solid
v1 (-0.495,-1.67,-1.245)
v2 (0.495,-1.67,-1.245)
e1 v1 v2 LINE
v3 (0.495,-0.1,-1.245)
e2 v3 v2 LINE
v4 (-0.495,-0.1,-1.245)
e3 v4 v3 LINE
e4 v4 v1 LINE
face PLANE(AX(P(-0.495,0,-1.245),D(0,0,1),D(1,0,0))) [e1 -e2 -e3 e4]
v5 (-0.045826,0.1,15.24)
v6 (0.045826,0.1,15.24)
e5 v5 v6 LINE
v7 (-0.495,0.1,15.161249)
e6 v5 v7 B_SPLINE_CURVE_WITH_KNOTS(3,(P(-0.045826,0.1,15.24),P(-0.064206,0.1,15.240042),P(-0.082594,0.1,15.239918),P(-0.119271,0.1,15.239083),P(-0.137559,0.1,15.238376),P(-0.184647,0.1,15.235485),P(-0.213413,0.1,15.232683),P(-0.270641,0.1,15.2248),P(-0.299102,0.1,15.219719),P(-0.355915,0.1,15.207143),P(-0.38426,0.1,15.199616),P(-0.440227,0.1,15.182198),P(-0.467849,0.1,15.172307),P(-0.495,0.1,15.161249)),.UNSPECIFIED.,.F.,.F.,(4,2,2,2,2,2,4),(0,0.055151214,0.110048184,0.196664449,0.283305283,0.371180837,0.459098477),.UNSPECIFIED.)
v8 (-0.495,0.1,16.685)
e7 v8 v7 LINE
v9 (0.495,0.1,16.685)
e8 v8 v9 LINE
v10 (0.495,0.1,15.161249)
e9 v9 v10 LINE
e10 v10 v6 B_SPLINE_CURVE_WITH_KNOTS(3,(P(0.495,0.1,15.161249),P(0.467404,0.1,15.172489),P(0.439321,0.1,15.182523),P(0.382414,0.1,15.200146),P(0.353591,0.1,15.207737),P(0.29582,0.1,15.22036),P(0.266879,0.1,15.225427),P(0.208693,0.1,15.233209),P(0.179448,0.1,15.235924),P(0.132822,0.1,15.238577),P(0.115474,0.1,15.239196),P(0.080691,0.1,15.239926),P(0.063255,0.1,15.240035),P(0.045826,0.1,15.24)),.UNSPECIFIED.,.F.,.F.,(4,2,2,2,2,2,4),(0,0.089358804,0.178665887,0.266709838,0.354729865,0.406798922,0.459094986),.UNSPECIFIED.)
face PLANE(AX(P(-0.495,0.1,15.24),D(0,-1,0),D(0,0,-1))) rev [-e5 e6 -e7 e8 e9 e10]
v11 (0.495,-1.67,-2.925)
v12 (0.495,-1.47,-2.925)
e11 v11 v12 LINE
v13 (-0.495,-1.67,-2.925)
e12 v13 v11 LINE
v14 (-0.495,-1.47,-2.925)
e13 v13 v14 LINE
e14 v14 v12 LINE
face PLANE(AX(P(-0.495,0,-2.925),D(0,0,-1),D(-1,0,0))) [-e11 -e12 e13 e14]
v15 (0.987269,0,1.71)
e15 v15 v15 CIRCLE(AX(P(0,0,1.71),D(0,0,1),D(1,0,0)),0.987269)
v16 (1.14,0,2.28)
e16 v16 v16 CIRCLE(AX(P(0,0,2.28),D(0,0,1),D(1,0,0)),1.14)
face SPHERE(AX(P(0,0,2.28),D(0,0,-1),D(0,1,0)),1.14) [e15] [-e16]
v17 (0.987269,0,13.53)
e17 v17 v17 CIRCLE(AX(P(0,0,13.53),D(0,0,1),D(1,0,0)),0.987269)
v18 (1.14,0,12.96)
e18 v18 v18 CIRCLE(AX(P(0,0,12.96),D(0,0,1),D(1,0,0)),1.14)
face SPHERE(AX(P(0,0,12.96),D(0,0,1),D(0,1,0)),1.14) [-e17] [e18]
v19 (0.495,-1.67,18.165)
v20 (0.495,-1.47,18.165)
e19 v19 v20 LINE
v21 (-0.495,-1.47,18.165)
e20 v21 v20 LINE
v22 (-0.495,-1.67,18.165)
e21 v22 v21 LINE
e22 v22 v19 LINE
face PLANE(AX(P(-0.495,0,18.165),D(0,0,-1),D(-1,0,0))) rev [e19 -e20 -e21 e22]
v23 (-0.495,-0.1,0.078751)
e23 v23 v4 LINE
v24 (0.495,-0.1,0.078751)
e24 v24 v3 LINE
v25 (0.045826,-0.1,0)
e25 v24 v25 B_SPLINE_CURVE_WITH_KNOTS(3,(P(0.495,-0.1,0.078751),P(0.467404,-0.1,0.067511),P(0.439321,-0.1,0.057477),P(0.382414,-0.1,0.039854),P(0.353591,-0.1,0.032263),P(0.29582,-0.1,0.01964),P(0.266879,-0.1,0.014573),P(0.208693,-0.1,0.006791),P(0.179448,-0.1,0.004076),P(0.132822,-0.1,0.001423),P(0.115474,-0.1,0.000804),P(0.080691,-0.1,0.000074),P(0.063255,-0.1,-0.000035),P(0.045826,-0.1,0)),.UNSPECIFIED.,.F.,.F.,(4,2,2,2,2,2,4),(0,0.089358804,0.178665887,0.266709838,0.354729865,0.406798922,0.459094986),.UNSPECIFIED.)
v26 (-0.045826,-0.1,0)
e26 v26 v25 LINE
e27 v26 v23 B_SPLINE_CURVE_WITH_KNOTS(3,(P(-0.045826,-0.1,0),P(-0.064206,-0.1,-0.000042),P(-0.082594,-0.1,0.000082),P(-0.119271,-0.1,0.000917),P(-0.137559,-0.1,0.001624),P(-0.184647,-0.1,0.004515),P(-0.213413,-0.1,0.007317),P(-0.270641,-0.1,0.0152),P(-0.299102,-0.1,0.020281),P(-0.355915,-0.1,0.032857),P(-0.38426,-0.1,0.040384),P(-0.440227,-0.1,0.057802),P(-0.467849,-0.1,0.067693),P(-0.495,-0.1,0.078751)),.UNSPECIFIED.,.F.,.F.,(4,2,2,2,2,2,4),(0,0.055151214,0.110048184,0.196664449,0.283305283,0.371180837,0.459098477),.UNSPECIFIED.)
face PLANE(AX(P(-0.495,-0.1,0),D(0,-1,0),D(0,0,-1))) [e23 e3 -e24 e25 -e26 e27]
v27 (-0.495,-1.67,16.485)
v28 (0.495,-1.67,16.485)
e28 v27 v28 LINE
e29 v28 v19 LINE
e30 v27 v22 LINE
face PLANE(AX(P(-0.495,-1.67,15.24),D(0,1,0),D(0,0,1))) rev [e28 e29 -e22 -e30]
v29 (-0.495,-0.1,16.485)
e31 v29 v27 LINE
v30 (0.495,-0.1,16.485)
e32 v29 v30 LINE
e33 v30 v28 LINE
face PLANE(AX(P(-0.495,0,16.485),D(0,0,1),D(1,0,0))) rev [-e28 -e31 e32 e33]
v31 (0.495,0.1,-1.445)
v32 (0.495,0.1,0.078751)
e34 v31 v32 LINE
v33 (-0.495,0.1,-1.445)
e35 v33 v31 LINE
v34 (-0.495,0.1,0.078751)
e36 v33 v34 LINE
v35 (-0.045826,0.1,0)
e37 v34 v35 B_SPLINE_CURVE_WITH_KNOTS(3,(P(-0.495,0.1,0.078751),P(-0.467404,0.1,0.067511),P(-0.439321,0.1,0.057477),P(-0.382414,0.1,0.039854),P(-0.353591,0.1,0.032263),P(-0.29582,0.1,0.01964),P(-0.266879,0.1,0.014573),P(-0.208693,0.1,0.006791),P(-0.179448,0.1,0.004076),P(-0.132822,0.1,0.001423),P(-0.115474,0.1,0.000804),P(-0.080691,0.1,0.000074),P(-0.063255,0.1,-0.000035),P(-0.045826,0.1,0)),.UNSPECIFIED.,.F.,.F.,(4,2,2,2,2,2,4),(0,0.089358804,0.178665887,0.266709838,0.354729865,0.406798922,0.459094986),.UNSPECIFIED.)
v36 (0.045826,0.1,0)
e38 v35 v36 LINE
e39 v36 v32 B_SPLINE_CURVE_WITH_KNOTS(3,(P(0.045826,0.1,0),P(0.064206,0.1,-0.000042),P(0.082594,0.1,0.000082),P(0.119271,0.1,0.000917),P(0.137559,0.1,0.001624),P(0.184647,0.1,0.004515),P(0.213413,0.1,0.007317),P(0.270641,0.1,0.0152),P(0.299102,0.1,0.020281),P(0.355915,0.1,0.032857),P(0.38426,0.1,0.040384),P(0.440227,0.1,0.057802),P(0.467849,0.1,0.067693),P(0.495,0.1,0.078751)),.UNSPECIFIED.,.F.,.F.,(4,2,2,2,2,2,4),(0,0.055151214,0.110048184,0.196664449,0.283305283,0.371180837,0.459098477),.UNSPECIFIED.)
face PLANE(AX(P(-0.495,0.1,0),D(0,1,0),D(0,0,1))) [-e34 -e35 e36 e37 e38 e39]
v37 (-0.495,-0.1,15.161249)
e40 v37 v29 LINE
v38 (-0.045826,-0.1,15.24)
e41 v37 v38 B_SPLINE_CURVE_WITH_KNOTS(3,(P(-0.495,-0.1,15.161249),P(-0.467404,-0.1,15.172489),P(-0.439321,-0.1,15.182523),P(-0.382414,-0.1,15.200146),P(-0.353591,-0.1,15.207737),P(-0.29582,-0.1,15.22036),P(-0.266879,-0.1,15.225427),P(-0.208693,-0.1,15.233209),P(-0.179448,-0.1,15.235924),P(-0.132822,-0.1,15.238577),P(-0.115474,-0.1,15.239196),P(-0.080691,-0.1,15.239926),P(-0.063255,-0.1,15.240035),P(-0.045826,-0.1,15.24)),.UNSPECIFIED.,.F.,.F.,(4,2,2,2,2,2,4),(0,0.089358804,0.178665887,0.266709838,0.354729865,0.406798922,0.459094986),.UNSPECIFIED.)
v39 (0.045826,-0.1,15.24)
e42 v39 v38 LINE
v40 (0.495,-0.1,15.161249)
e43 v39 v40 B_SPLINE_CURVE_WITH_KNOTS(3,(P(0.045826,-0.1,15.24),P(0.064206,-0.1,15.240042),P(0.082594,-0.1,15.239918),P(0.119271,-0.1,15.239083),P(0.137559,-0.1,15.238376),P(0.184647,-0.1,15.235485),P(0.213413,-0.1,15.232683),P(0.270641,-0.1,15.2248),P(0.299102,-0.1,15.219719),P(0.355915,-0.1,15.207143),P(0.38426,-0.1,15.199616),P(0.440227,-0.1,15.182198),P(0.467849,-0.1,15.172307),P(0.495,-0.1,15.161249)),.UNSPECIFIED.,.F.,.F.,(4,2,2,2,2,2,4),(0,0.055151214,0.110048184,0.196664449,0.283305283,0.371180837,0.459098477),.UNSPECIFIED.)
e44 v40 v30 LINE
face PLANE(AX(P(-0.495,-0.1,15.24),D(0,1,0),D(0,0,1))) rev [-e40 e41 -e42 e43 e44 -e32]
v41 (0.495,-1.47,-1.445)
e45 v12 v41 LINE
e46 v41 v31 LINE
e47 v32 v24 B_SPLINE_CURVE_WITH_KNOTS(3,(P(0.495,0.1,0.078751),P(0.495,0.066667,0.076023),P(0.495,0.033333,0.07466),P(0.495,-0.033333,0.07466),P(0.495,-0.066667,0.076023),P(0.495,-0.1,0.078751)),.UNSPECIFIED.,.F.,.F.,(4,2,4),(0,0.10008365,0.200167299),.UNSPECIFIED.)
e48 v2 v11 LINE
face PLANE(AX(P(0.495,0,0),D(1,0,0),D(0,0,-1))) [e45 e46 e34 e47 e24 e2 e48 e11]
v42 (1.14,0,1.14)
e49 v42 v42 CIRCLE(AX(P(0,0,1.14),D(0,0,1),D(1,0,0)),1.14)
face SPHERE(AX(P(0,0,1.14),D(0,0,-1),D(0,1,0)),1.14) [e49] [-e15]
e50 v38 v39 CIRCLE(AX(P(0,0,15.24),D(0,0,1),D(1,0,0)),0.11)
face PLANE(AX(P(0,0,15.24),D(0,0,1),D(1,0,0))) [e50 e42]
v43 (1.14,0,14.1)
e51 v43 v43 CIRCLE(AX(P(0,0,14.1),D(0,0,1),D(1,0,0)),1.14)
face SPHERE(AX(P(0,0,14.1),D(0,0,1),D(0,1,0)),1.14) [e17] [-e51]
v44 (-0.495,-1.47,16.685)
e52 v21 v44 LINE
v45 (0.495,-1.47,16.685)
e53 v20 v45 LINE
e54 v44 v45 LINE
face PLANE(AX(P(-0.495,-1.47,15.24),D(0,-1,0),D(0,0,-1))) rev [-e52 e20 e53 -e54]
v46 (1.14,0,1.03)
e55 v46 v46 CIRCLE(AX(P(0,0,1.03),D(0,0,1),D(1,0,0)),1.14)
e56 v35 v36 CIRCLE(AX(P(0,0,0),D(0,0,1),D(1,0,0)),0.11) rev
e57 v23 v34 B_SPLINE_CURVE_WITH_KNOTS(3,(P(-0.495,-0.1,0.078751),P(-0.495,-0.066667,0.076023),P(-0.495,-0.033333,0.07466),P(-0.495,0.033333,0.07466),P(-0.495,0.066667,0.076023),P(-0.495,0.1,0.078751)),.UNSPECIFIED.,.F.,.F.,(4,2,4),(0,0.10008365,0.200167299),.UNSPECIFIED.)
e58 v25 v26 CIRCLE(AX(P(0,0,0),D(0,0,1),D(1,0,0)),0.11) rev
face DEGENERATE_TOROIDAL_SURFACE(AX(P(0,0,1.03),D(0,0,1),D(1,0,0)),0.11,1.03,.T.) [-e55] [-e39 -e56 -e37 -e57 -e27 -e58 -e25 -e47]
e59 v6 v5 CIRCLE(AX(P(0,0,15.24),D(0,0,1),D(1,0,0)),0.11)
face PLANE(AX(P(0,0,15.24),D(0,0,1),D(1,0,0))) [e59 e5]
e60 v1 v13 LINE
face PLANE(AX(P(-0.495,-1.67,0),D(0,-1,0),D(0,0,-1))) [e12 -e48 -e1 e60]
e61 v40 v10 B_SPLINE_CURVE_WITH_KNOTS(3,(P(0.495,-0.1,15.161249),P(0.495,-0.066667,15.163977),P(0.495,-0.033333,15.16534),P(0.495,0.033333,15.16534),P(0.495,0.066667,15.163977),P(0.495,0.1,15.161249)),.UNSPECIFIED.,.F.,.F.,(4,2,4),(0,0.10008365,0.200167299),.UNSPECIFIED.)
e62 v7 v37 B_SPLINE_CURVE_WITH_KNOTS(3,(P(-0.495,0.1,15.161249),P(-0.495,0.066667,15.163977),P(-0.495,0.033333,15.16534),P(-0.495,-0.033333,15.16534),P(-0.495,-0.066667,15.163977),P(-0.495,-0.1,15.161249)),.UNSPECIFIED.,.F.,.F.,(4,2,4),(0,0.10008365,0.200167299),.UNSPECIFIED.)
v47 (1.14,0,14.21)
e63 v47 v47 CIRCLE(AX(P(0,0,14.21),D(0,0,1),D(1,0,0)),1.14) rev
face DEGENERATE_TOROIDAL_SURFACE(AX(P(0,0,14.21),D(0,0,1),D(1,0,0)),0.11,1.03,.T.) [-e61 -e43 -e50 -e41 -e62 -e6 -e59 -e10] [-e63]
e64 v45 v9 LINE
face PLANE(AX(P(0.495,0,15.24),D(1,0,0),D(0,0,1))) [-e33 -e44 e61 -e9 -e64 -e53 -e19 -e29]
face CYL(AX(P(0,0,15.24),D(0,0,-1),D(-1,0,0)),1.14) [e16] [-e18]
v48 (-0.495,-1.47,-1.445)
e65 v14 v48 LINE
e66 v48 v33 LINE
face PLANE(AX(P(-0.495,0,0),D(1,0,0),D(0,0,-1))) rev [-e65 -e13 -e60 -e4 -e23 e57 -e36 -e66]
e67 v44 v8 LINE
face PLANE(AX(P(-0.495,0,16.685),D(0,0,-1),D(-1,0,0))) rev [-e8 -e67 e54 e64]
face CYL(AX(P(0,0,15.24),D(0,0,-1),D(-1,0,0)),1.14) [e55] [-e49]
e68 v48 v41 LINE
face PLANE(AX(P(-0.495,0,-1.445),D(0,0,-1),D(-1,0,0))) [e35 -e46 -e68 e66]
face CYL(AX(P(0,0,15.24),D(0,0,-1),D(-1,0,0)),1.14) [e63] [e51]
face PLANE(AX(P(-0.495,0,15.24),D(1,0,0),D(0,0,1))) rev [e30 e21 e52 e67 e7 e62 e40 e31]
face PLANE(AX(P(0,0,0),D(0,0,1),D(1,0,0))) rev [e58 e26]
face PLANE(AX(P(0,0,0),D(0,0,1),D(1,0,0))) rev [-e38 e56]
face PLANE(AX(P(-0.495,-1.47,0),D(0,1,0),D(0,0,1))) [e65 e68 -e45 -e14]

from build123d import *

# Parameters (mm, degrees)
SKETCH1_R        = 1.14
EXTRUSION1_DEPTH = 15.24
EXTRUSION2_DEPTH = 0.495
FILLET3_R        = 1.03


with BuildPart() as part:
    # Sketch1 → Extrusion1 (new body)
    with BuildSketch(Plane.XY):
        Circle(SKETCH1_R)
    extrude(amount=EXTRUSION1_DEPTH)

    # Sketch3 → Revolution3 (revolve, cut)
    with BuildSketch(Plane.YZ, mode=Mode.PRIVATE) as revolution3_sk:
        with BuildLine():
            Line((1.14, 12.96), (1.14, 14.1))
            ThreePointArc((1.14, 14.1), (1.101155442, 13.804946289), (0.98726896, 13.53))
            ThreePointArc((0.98726896, 13.53), (1.101155442, 13.255053711), (1.14, 12.96))
        make_face()
    revolution3 = revolve(revolution3_sk.sketch.rotate(Axis((0, 0, 14.1), (0, 0, -1)), 90), axis=Axis((0, 0, 14.1), (0, 0, -1)), mode=Mode.SUBTRACT)

    # Mirror2: Revolution3 across plane
    add(revolution3.mirror(Plane.XY.offset(7.62)), mode=Mode.SUBTRACT)

    # Sketch4 → Extrusion2 (add, symmetric)
    with BuildSketch(Plane.YZ):
        with BuildLine():
            Line((-0.1, 0), (0, 0))
            ThreePointArc((0, 0), (-0.050048254, 0.001099138), (-0.1, 0.004394435))
            Line((-0.1, 0.004394435), (-0.1, 0))
        make_face()
        with BuildLine():
            ThreePointArc((0, 0), (0.050048254, 0.001099138), (0.1, 0.004394435))
            Line((0.1, 0.004394435), (0.1, 0.138771336))
            Line((0.1, 0.138771336), (-0.1, 0.138771336))
            Line((-0.1, 0.138771336), (-0.1, 0.004394435))
            ThreePointArc((-0.1, 0.004394435), (-0.050048254, 0.001099138), (0, 0))
        make_face()
        Polygon((0.1, -1.445), (0.1, 0), (0, 0), (-0.1, 0), (-0.1, -1.245), (-1.67, -1.245), (-1.67, -2.925), (-1.47, -2.925), (-1.47, -1.445), align=None)
    extrusion2 = extrude(amount=EXTRUSION2_DEPTH, both=True)

    # Mirror3: Extrusion2 across plane
    add(extrusion2.mirror(Plane.XY.offset(7.62)))

    # Fillet3
    # the kernel refuses this fillet: 1.03 mm, written as the material it takes off along each edge
    with BuildSketch(Plane(origin=(0, 0, 15.24), x_dir=(1, 0, 0), z_dir=(0, -1, 0))) as fillet3_piece_1_section:
        with BuildLine():
            CenterArc((1.14 - FILLET3_R, -FILLET3_R), FILLET3_R, 0, 90)
            Line((1.14 - FILLET3_R, 0), (1.14, 0))
            Line((1.14, 0), (1.14, -FILLET3_R))
        make_face()
    fillet3_piece_1 = revolve(axis=Axis((0, 0, 15.24), (0, 0, 1)), mode=Mode.PRIVATE)
    fillet3_piece_1 = split(fillet3_piece_1, bisect_by=Plane(origin=(0.495, 4e-09, 15.000808078), z_dir=(1, 0, 0)), keep=Keep.TOP, mode=Mode.PRIVATE)
    add(fillet3_piece_1, mode=Mode.SUBTRACT)
    with BuildSketch(Plane(origin=(0, 0, 15.24), x_dir=(1, 0, 0), z_dir=(0, -1, 0))) as fillet3_piece_2_section:
        with BuildLine():
            CenterArc((1.14 - FILLET3_R, -FILLET3_R), FILLET3_R, 0, 90)
            Line((1.14 - FILLET3_R, 0), (1.14, 0))
            Line((1.14, 0), (1.14, -FILLET3_R))
        make_face()
    fillet3_piece_2 = revolve(axis=Axis((0, 0, 15.24), (0, 0, 1)), mode=Mode.PRIVATE)
    fillet3_piece_2 = split(fillet3_piece_2, bisect_by=Plane(origin=(0, 0.1, 15.013614208), z_dir=(0, 1, 0)), keep=Keep.TOP, mode=Mode.PRIVATE)
    add(fillet3_piece_2, mode=Mode.SUBTRACT)
    with BuildSketch(Plane(origin=(0, 0, 15.24), x_dir=(1, 0, 0), z_dir=(0, -1, 0))) as fillet3_piece_3_section:
        with BuildLine():
            CenterArc((1.14 - FILLET3_R, -FILLET3_R), FILLET3_R, 0, 90)
            Line((1.14 - FILLET3_R, 0), (1.14, 0))
            Line((1.14, 0), (1.14, -FILLET3_R))
        make_face()
    fillet3_piece_3 = revolve(axis=Axis((0, 0, 15.24), (0, 0, 1)), mode=Mode.PRIVATE)
    fillet3_piece_3 = split(fillet3_piece_3, bisect_by=Plane(origin=(8e-09, -0.1, 15.013614602), z_dir=(0, -1, 0)), keep=Keep.TOP, mode=Mode.PRIVATE)
    add(fillet3_piece_3, mode=Mode.SUBTRACT)
    with BuildSketch(Plane(origin=(0, 0, 15.24), x_dir=(1, 0, 0), z_dir=(0, -1, 0))) as fillet3_piece_4_section:
        with BuildLine():
            CenterArc((1.14 - FILLET3_R, -FILLET3_R), FILLET3_R, 0, 90)
            Line((1.14 - FILLET3_R, 0), (1.14, 0))
            Line((1.14, 0), (1.14, -FILLET3_R))
        make_face()
    fillet3_piece_4 = revolve(axis=Axis((0, 0, 15.24), (0, 0, 1)), mode=Mode.PRIVATE)
    fillet3_piece_4 = split(fillet3_piece_4, bisect_by=Plane(origin=(-0.495, -1e-09, 15.000807979), z_dir=(-1, 0, 0)), keep=Keep.TOP, mode=Mode.PRIVATE)
    add(fillet3_piece_4, mode=Mode.SUBTRACT)
    with BuildSketch(Plane(origin=(0, 0, 0), x_dir=(1, 0, 0), z_dir=(0, -1, 0))) as fillet3_piece_5_section:
        with BuildLine():
            CenterArc((1.14 - FILLET3_R, FILLET3_R), FILLET3_R, 270, 90)
            Line((1.14 - FILLET3_R, 0), (1.14, 0))
            Line((1.14, 0), (1.14, FILLET3_R))
        make_face()
    fillet3_piece_5 = revolve(axis=Axis((0, 0, 0), (0, 0, 1)), mode=Mode.PRIVATE)
    fillet3_piece_5 = split(fillet3_piece_5, bisect_by=Plane(origin=(0.495, 4e-09, 0.239191922), z_dir=(1, 0, 0)), keep=Keep.TOP, mode=Mode.PRIVATE)
    add(fillet3_piece_5, mode=Mode.SUBTRACT)
    with BuildSketch(Plane(origin=(0, 0, 0), x_dir=(1, 0, 0), z_dir=(0, -1, 0))) as fillet3_piece_6_section:
        with BuildLine():
            CenterArc((1.14 - FILLET3_R, FILLET3_R), FILLET3_R, 270, 90)
            Line((1.14 - FILLET3_R, 0), (1.14, 0))
            Line((1.14, 0), (1.14, FILLET3_R))
        make_face()
    fillet3_piece_6 = revolve(axis=Axis((0, 0, 0), (0, 0, 1)), mode=Mode.PRIVATE)
    fillet3_piece_6 = split(fillet3_piece_6, bisect_by=Plane(origin=(0, 0.1, 0.226385792), z_dir=(0, 1, 0)), keep=Keep.TOP, mode=Mode.PRIVATE)
    add(fillet3_piece_6, mode=Mode.SUBTRACT)
    with BuildSketch(Plane(origin=(0, 0, 0), x_dir=(1, 0, 0), z_dir=(0, -1, 0))) as fillet3_piece_7_section:
        with BuildLine():
            CenterArc((1.14 - FILLET3_R, FILLET3_R), FILLET3_R, 270, 90)
            Line((1.14 - FILLET3_R, 0), (1.14, 0))
            Line((1.14, 0), (1.14, FILLET3_R))
        make_face()
    fillet3_piece_7 = revolve(axis=Axis((0, 0, 0), (0, 0, 1)), mode=Mode.PRIVATE)
    fillet3_piece_7 = split(fillet3_piece_7, bisect_by=Plane(origin=(8e-09, -0.1, 0.226385398), z_dir=(0, -1, 0)), keep=Keep.TOP, mode=Mode.PRIVATE)
    add(fillet3_piece_7, mode=Mode.SUBTRACT)
    with BuildSketch(Plane(origin=(0, 0, 0), x_dir=(1, 0, 0), z_dir=(0, -1, 0))) as fillet3_piece_8_section:
        with BuildLine():
            CenterArc((1.14 - FILLET3_R, FILLET3_R), FILLET3_R, 270, 90)
            Line((1.14 - FILLET3_R, 0), (1.14, 0))
            Line((1.14, 0), (1.14, FILLET3_R))
        make_face()
    fillet3_piece_8 = revolve(axis=Axis((0, 0, 0), (0, 0, 1)), mode=Mode.PRIVATE)
    fillet3_piece_8 = split(fillet3_piece_8, bisect_by=Plane(origin=(-0.495, -1e-09, 0.239192021), z_dir=(-1, 0, 0)), keep=Keep.TOP, mode=Mode.PRIVATE)
    add(fillet3_piece_8, mode=Mode.SUBTRACT)


solid = part.part
